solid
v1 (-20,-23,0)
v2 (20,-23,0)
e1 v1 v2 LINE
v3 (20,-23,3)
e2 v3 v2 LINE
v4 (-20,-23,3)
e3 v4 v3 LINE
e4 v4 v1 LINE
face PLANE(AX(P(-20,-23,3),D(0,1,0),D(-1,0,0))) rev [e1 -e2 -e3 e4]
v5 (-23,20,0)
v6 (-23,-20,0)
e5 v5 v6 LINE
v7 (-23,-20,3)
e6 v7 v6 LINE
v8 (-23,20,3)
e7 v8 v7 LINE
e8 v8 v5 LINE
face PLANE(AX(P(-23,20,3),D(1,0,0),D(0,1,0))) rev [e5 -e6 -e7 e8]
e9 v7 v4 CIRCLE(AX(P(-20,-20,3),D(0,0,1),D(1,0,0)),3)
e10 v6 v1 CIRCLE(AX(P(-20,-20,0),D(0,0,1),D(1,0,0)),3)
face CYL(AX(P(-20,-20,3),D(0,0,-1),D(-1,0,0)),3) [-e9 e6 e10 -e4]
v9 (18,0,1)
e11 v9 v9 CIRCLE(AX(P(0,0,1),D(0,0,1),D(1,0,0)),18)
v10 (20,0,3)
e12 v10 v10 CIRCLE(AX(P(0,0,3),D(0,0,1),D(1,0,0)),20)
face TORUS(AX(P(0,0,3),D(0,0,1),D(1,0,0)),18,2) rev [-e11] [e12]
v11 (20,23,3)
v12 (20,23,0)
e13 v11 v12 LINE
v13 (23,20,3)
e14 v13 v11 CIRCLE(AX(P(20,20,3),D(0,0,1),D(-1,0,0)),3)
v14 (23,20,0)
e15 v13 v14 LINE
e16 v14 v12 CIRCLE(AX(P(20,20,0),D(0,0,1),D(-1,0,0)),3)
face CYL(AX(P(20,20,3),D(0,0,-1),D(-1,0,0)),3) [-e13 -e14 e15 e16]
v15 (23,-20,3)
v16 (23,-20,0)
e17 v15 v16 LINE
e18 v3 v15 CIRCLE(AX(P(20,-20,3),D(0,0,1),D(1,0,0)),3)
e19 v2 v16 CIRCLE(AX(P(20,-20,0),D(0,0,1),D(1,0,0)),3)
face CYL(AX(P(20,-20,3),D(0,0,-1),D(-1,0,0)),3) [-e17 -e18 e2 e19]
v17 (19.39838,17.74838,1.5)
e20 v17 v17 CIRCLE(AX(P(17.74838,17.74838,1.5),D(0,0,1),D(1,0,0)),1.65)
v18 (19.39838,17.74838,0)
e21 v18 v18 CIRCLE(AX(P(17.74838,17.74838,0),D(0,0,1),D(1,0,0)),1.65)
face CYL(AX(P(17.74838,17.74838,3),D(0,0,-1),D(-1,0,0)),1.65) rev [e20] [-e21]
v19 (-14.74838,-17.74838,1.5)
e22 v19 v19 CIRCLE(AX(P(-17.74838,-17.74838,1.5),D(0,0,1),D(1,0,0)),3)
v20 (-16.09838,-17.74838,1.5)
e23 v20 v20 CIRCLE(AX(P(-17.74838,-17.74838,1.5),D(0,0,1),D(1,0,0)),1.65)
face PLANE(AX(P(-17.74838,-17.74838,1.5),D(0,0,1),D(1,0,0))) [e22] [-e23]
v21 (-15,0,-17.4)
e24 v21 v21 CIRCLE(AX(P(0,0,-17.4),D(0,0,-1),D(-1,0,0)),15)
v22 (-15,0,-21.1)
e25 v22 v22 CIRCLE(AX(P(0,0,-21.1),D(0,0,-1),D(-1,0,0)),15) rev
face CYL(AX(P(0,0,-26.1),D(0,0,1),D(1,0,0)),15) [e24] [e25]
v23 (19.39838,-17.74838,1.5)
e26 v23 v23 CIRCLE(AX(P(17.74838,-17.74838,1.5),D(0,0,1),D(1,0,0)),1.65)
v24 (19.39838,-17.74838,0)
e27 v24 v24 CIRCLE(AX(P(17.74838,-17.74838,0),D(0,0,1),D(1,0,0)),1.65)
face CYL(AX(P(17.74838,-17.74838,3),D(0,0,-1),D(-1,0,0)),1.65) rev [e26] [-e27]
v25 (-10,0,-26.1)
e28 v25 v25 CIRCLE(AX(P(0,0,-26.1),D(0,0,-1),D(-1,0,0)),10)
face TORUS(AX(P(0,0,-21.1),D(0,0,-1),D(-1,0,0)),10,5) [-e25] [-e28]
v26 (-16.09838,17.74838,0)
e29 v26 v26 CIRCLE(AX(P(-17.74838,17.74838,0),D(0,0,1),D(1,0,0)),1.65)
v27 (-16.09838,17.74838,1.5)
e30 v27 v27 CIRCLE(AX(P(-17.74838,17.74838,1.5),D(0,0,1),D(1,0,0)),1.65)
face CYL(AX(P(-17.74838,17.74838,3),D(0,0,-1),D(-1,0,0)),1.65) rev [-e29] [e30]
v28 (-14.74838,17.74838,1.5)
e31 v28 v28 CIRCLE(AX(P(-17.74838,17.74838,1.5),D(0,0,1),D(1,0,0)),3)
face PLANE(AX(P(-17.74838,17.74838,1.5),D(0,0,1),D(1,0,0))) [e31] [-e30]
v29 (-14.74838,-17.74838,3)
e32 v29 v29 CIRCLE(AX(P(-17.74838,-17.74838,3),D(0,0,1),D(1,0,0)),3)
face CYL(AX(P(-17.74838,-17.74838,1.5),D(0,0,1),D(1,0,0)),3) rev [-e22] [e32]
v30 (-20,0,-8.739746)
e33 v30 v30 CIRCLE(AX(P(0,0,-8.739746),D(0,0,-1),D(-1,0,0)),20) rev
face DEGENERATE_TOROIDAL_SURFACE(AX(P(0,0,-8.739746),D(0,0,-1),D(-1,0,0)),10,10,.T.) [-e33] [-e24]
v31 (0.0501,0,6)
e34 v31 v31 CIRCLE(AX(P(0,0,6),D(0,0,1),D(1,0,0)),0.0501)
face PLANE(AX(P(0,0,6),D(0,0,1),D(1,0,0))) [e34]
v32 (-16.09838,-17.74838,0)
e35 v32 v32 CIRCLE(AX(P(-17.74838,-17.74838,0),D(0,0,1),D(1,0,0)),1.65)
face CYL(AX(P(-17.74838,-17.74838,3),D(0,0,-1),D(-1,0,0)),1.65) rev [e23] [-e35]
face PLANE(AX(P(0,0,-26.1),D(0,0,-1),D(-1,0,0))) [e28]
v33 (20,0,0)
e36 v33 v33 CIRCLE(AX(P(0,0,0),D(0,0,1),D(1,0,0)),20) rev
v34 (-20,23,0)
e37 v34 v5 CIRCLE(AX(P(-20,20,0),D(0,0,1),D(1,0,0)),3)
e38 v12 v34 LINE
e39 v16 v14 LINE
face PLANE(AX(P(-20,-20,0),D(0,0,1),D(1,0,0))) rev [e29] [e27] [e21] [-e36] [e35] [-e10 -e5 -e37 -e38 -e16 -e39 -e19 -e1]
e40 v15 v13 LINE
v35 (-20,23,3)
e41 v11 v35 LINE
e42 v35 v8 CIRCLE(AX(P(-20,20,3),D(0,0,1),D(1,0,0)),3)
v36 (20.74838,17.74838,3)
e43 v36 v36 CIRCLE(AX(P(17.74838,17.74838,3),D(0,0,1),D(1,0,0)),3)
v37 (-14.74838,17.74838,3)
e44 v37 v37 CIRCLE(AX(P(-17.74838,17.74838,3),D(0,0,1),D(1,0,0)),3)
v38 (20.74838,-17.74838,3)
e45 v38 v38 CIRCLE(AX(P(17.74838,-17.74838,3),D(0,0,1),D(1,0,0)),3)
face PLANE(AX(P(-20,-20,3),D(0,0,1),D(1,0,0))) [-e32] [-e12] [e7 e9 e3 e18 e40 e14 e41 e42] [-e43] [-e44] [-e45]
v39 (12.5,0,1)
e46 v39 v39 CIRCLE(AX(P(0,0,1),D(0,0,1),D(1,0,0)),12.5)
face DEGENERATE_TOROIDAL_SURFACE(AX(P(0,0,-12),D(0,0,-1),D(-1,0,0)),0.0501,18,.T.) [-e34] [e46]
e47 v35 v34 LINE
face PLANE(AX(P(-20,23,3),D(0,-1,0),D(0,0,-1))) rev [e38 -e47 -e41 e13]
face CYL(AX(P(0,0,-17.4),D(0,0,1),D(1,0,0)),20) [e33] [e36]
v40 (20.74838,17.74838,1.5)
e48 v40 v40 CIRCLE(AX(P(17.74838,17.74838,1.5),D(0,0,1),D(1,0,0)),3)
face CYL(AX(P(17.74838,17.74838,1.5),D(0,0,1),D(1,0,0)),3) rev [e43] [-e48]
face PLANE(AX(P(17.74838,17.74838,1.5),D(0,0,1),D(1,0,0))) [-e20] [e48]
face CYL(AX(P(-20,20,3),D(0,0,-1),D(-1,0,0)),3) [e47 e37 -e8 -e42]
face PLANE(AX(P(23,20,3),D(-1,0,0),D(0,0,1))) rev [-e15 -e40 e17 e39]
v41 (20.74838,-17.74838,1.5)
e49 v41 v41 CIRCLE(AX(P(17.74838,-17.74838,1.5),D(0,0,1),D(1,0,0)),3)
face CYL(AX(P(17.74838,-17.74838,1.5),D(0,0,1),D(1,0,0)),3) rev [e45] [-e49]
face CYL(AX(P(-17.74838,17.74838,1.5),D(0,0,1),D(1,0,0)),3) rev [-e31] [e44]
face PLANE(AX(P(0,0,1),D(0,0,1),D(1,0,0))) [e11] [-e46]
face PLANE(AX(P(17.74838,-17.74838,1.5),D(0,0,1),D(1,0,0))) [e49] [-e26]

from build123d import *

# Parameters (mm, degrees)
ESQUISSE1_R             = 1.65
BOSS_EXTRU_1_DEPTH      = 3
ESQUISSE2_R             = 3
ENL_V_MAT_EXTRU_1_DEPTH = 1.5
ESQUISSE3_R             = 20
BOSS_EXTRU_2_DEPTH      = 17.4
ESQUISSE4_R             = 15
BOSS_EXTRU_3_DEPTH      = 8.7
CONG_1_R                = 10
CONG_2_R                = 5
ESQUISSE5_R             = 20
ENL_V_MAT_EXTRU_2_DEPTH = 2
ESQUISSE6_R             = 12.5
BOSS_EXTRU_4_DEPTH      = 5
CONG_3_R                = 18
CONG_4_R                = 2


# Some blends are built 0.0001 mm under size
with BuildPart() as part:
    # Esquisse1 → Boss.-Extru.1 (new body)
    with BuildSketch(Plane.XY):
        with BuildLine():
            Line((-20, 23), (20, 23))
            ThreePointArc((20, 23), (22.121320344, 22.121320344), (23, 20))
            Line((23, 20), (23, -20))
            ThreePointArc((23, -20), (22.121320344, -22.121320344), (20, -23))
            Line((20, -23), (-20, -23))
            ThreePointArc((-20, -23), (-22.121320344, -22.121320344), (-23, -20))
            Line((-23, -20), (-23, 20))
            ThreePointArc((-23, 20), (-22.121320344, 22.121320344), (-20, 23))
        make_face()
        with Locations((17.748380208, 17.748380208)):
            Circle(ESQUISSE1_R, mode=Mode.SUBTRACT)
        with Locations((-17.748380208, 17.748380208)):
            Circle(ESQUISSE1_R, mode=Mode.SUBTRACT)
        with Locations((17.748380208, -17.748380208)):
            Circle(ESQUISSE1_R, mode=Mode.SUBTRACT)
        with Locations((-17.748380208, -17.748380208)):
            Circle(ESQUISSE1_R, mode=Mode.SUBTRACT)
    extrude(amount=BOSS_EXTRU_1_DEPTH)

    # Esquisse2 → Enlèv. mat.-Extru.1 (cut)
    with BuildSketch(Plane.XY.offset(3)):
        with Locations((-17.748380208, 17.748380208)):
            Circle(ESQUISSE2_R)
        with Locations((17.748380208, 17.748380208)):
            Circle(ESQUISSE2_R)
        with Locations((17.748380208, -17.748380208)):
            Circle(ESQUISSE2_R)
        with Locations((-17.748380208, -17.748380208)):
            Circle(ESQUISSE2_R)
    extrude(amount=-ENL_V_MAT_EXTRU_1_DEPTH, mode=Mode.SUBTRACT)

    # Esquisse3 → Boss.-Extru.2 (add)
    with BuildSketch(Plane(origin=(0, 0, 0), x_dir=(-1, 0, 0), z_dir=(0, 0, -1))):
        with Locations(Location((0, 0, 0), (0, 0, 180))):
            Circle(ESQUISSE3_R)
    extrude(amount=BOSS_EXTRU_2_DEPTH)

    # Esquisse4 → Boss.-Extru.3 (add)
    with BuildSketch(Plane(origin=(0, 0, -17.4), x_dir=(-1, 0, 0), z_dir=(0, 0, -1))):
        Circle(ESQUISSE4_R)
    extrude(amount=BOSS_EXTRU_3_DEPTH)

    # Congé1
    # the kernel refuses this fillet: 10 mm, written as the material it takes off along each edge
    with BuildSketch(Plane(origin=(0, 0, -17.4), x_dir=(1, 0, 0), z_dir=(0, 1, 0))) as cong_1_piece_1_section:
        with BuildLine():
            CenterArc((10, -8.660254038), CONG_1_R, 0, 60)
            Line((15, 0), (15.1, 0.173205081))
            ThreePointArc((15.1, 0.173205081), (17.5, 0.2), (20, 0.2))
            Line((20, 0.2), (20.2, 0))
            Line((20.2, 0), (20.2, -8.660254038))
            Line((20.2, -8.660254038), (20, -8.660254038))
        make_face()
    cong_1_piece_1 = revolve(axis=Axis((0, 0, -17.4), (0, 0, -1)), mode=Mode.PRIVATE)
    cong_1_piece_1 = cong_1_piece_1 - Plane(origin=(0, 0, -13.800562686), x_dir=(-1, 0, 0), z_dir=(0, 0, 1)) * Cylinder(15, 81, mode=Mode.PRIVATE)
    add(cong_1_piece_1, mode=Mode.SUBTRACT)

    # Congé2
    cong_2_edges = [part.edges().sort_by_distance(p)[0] for p in [
        (15, 0, -26.1),
    ]]
    fillet(cong_2_edges, radius=CONG_2_R)

    # Esquisse5 → Enlèv. mat.-Extru.2 (cut)
    with BuildSketch(Plane.XY.offset(3)):
        Circle(ESQUISSE5_R)
    extrude(amount=-ENL_V_MAT_EXTRU_2_DEPTH, mode=Mode.SUBTRACT)

    # Esquisse6 → Boss.-Extru.4 (add)
    with BuildSketch(Plane.XY.offset(1)):
        Circle(ESQUISSE6_R)
    extrude(amount=BOSS_EXTRU_4_DEPTH)

    # Congé3
    # the kernel refuses this fillet: 18 mm, written as the material it takes off along each edge
    with BuildSketch(Plane(origin=(0, 0, 6), x_dir=(1, 0, 0), z_dir=(0, -1, 0))) as cong_3_piece_1:
        with BuildLine():
            CenterArc((0.050100402, -18), CONG_3_R, 46.238257307, 43.761742693)
            Line((0.050100402, 0), (0.050100402, 0.36))
            Line((0.050100402, 0.36), (12.5, 0.36))
            Line((12.5, 0.36), (12.86, 0))
            ThreePointArc((12.86, 0), (12.86, -2.5), (12.748997992, -4.74))
            Line((12.748997992, -4.74), (12.5, -5))
        make_face()
    revolve(axis=Axis((0, 0, 6), (0, 0, 1)), mode=Mode.SUBTRACT)

    # Congé4
    cong_4_edges = [part.edges().sort_by_distance(p)[0] for p in [
        (-20, 0, 1),
    ]]
    fillet(cong_4_edges, radius=CONG_4_R - 0.0001)  # a hair under: the kernel refuses the full size


solid = part.part
